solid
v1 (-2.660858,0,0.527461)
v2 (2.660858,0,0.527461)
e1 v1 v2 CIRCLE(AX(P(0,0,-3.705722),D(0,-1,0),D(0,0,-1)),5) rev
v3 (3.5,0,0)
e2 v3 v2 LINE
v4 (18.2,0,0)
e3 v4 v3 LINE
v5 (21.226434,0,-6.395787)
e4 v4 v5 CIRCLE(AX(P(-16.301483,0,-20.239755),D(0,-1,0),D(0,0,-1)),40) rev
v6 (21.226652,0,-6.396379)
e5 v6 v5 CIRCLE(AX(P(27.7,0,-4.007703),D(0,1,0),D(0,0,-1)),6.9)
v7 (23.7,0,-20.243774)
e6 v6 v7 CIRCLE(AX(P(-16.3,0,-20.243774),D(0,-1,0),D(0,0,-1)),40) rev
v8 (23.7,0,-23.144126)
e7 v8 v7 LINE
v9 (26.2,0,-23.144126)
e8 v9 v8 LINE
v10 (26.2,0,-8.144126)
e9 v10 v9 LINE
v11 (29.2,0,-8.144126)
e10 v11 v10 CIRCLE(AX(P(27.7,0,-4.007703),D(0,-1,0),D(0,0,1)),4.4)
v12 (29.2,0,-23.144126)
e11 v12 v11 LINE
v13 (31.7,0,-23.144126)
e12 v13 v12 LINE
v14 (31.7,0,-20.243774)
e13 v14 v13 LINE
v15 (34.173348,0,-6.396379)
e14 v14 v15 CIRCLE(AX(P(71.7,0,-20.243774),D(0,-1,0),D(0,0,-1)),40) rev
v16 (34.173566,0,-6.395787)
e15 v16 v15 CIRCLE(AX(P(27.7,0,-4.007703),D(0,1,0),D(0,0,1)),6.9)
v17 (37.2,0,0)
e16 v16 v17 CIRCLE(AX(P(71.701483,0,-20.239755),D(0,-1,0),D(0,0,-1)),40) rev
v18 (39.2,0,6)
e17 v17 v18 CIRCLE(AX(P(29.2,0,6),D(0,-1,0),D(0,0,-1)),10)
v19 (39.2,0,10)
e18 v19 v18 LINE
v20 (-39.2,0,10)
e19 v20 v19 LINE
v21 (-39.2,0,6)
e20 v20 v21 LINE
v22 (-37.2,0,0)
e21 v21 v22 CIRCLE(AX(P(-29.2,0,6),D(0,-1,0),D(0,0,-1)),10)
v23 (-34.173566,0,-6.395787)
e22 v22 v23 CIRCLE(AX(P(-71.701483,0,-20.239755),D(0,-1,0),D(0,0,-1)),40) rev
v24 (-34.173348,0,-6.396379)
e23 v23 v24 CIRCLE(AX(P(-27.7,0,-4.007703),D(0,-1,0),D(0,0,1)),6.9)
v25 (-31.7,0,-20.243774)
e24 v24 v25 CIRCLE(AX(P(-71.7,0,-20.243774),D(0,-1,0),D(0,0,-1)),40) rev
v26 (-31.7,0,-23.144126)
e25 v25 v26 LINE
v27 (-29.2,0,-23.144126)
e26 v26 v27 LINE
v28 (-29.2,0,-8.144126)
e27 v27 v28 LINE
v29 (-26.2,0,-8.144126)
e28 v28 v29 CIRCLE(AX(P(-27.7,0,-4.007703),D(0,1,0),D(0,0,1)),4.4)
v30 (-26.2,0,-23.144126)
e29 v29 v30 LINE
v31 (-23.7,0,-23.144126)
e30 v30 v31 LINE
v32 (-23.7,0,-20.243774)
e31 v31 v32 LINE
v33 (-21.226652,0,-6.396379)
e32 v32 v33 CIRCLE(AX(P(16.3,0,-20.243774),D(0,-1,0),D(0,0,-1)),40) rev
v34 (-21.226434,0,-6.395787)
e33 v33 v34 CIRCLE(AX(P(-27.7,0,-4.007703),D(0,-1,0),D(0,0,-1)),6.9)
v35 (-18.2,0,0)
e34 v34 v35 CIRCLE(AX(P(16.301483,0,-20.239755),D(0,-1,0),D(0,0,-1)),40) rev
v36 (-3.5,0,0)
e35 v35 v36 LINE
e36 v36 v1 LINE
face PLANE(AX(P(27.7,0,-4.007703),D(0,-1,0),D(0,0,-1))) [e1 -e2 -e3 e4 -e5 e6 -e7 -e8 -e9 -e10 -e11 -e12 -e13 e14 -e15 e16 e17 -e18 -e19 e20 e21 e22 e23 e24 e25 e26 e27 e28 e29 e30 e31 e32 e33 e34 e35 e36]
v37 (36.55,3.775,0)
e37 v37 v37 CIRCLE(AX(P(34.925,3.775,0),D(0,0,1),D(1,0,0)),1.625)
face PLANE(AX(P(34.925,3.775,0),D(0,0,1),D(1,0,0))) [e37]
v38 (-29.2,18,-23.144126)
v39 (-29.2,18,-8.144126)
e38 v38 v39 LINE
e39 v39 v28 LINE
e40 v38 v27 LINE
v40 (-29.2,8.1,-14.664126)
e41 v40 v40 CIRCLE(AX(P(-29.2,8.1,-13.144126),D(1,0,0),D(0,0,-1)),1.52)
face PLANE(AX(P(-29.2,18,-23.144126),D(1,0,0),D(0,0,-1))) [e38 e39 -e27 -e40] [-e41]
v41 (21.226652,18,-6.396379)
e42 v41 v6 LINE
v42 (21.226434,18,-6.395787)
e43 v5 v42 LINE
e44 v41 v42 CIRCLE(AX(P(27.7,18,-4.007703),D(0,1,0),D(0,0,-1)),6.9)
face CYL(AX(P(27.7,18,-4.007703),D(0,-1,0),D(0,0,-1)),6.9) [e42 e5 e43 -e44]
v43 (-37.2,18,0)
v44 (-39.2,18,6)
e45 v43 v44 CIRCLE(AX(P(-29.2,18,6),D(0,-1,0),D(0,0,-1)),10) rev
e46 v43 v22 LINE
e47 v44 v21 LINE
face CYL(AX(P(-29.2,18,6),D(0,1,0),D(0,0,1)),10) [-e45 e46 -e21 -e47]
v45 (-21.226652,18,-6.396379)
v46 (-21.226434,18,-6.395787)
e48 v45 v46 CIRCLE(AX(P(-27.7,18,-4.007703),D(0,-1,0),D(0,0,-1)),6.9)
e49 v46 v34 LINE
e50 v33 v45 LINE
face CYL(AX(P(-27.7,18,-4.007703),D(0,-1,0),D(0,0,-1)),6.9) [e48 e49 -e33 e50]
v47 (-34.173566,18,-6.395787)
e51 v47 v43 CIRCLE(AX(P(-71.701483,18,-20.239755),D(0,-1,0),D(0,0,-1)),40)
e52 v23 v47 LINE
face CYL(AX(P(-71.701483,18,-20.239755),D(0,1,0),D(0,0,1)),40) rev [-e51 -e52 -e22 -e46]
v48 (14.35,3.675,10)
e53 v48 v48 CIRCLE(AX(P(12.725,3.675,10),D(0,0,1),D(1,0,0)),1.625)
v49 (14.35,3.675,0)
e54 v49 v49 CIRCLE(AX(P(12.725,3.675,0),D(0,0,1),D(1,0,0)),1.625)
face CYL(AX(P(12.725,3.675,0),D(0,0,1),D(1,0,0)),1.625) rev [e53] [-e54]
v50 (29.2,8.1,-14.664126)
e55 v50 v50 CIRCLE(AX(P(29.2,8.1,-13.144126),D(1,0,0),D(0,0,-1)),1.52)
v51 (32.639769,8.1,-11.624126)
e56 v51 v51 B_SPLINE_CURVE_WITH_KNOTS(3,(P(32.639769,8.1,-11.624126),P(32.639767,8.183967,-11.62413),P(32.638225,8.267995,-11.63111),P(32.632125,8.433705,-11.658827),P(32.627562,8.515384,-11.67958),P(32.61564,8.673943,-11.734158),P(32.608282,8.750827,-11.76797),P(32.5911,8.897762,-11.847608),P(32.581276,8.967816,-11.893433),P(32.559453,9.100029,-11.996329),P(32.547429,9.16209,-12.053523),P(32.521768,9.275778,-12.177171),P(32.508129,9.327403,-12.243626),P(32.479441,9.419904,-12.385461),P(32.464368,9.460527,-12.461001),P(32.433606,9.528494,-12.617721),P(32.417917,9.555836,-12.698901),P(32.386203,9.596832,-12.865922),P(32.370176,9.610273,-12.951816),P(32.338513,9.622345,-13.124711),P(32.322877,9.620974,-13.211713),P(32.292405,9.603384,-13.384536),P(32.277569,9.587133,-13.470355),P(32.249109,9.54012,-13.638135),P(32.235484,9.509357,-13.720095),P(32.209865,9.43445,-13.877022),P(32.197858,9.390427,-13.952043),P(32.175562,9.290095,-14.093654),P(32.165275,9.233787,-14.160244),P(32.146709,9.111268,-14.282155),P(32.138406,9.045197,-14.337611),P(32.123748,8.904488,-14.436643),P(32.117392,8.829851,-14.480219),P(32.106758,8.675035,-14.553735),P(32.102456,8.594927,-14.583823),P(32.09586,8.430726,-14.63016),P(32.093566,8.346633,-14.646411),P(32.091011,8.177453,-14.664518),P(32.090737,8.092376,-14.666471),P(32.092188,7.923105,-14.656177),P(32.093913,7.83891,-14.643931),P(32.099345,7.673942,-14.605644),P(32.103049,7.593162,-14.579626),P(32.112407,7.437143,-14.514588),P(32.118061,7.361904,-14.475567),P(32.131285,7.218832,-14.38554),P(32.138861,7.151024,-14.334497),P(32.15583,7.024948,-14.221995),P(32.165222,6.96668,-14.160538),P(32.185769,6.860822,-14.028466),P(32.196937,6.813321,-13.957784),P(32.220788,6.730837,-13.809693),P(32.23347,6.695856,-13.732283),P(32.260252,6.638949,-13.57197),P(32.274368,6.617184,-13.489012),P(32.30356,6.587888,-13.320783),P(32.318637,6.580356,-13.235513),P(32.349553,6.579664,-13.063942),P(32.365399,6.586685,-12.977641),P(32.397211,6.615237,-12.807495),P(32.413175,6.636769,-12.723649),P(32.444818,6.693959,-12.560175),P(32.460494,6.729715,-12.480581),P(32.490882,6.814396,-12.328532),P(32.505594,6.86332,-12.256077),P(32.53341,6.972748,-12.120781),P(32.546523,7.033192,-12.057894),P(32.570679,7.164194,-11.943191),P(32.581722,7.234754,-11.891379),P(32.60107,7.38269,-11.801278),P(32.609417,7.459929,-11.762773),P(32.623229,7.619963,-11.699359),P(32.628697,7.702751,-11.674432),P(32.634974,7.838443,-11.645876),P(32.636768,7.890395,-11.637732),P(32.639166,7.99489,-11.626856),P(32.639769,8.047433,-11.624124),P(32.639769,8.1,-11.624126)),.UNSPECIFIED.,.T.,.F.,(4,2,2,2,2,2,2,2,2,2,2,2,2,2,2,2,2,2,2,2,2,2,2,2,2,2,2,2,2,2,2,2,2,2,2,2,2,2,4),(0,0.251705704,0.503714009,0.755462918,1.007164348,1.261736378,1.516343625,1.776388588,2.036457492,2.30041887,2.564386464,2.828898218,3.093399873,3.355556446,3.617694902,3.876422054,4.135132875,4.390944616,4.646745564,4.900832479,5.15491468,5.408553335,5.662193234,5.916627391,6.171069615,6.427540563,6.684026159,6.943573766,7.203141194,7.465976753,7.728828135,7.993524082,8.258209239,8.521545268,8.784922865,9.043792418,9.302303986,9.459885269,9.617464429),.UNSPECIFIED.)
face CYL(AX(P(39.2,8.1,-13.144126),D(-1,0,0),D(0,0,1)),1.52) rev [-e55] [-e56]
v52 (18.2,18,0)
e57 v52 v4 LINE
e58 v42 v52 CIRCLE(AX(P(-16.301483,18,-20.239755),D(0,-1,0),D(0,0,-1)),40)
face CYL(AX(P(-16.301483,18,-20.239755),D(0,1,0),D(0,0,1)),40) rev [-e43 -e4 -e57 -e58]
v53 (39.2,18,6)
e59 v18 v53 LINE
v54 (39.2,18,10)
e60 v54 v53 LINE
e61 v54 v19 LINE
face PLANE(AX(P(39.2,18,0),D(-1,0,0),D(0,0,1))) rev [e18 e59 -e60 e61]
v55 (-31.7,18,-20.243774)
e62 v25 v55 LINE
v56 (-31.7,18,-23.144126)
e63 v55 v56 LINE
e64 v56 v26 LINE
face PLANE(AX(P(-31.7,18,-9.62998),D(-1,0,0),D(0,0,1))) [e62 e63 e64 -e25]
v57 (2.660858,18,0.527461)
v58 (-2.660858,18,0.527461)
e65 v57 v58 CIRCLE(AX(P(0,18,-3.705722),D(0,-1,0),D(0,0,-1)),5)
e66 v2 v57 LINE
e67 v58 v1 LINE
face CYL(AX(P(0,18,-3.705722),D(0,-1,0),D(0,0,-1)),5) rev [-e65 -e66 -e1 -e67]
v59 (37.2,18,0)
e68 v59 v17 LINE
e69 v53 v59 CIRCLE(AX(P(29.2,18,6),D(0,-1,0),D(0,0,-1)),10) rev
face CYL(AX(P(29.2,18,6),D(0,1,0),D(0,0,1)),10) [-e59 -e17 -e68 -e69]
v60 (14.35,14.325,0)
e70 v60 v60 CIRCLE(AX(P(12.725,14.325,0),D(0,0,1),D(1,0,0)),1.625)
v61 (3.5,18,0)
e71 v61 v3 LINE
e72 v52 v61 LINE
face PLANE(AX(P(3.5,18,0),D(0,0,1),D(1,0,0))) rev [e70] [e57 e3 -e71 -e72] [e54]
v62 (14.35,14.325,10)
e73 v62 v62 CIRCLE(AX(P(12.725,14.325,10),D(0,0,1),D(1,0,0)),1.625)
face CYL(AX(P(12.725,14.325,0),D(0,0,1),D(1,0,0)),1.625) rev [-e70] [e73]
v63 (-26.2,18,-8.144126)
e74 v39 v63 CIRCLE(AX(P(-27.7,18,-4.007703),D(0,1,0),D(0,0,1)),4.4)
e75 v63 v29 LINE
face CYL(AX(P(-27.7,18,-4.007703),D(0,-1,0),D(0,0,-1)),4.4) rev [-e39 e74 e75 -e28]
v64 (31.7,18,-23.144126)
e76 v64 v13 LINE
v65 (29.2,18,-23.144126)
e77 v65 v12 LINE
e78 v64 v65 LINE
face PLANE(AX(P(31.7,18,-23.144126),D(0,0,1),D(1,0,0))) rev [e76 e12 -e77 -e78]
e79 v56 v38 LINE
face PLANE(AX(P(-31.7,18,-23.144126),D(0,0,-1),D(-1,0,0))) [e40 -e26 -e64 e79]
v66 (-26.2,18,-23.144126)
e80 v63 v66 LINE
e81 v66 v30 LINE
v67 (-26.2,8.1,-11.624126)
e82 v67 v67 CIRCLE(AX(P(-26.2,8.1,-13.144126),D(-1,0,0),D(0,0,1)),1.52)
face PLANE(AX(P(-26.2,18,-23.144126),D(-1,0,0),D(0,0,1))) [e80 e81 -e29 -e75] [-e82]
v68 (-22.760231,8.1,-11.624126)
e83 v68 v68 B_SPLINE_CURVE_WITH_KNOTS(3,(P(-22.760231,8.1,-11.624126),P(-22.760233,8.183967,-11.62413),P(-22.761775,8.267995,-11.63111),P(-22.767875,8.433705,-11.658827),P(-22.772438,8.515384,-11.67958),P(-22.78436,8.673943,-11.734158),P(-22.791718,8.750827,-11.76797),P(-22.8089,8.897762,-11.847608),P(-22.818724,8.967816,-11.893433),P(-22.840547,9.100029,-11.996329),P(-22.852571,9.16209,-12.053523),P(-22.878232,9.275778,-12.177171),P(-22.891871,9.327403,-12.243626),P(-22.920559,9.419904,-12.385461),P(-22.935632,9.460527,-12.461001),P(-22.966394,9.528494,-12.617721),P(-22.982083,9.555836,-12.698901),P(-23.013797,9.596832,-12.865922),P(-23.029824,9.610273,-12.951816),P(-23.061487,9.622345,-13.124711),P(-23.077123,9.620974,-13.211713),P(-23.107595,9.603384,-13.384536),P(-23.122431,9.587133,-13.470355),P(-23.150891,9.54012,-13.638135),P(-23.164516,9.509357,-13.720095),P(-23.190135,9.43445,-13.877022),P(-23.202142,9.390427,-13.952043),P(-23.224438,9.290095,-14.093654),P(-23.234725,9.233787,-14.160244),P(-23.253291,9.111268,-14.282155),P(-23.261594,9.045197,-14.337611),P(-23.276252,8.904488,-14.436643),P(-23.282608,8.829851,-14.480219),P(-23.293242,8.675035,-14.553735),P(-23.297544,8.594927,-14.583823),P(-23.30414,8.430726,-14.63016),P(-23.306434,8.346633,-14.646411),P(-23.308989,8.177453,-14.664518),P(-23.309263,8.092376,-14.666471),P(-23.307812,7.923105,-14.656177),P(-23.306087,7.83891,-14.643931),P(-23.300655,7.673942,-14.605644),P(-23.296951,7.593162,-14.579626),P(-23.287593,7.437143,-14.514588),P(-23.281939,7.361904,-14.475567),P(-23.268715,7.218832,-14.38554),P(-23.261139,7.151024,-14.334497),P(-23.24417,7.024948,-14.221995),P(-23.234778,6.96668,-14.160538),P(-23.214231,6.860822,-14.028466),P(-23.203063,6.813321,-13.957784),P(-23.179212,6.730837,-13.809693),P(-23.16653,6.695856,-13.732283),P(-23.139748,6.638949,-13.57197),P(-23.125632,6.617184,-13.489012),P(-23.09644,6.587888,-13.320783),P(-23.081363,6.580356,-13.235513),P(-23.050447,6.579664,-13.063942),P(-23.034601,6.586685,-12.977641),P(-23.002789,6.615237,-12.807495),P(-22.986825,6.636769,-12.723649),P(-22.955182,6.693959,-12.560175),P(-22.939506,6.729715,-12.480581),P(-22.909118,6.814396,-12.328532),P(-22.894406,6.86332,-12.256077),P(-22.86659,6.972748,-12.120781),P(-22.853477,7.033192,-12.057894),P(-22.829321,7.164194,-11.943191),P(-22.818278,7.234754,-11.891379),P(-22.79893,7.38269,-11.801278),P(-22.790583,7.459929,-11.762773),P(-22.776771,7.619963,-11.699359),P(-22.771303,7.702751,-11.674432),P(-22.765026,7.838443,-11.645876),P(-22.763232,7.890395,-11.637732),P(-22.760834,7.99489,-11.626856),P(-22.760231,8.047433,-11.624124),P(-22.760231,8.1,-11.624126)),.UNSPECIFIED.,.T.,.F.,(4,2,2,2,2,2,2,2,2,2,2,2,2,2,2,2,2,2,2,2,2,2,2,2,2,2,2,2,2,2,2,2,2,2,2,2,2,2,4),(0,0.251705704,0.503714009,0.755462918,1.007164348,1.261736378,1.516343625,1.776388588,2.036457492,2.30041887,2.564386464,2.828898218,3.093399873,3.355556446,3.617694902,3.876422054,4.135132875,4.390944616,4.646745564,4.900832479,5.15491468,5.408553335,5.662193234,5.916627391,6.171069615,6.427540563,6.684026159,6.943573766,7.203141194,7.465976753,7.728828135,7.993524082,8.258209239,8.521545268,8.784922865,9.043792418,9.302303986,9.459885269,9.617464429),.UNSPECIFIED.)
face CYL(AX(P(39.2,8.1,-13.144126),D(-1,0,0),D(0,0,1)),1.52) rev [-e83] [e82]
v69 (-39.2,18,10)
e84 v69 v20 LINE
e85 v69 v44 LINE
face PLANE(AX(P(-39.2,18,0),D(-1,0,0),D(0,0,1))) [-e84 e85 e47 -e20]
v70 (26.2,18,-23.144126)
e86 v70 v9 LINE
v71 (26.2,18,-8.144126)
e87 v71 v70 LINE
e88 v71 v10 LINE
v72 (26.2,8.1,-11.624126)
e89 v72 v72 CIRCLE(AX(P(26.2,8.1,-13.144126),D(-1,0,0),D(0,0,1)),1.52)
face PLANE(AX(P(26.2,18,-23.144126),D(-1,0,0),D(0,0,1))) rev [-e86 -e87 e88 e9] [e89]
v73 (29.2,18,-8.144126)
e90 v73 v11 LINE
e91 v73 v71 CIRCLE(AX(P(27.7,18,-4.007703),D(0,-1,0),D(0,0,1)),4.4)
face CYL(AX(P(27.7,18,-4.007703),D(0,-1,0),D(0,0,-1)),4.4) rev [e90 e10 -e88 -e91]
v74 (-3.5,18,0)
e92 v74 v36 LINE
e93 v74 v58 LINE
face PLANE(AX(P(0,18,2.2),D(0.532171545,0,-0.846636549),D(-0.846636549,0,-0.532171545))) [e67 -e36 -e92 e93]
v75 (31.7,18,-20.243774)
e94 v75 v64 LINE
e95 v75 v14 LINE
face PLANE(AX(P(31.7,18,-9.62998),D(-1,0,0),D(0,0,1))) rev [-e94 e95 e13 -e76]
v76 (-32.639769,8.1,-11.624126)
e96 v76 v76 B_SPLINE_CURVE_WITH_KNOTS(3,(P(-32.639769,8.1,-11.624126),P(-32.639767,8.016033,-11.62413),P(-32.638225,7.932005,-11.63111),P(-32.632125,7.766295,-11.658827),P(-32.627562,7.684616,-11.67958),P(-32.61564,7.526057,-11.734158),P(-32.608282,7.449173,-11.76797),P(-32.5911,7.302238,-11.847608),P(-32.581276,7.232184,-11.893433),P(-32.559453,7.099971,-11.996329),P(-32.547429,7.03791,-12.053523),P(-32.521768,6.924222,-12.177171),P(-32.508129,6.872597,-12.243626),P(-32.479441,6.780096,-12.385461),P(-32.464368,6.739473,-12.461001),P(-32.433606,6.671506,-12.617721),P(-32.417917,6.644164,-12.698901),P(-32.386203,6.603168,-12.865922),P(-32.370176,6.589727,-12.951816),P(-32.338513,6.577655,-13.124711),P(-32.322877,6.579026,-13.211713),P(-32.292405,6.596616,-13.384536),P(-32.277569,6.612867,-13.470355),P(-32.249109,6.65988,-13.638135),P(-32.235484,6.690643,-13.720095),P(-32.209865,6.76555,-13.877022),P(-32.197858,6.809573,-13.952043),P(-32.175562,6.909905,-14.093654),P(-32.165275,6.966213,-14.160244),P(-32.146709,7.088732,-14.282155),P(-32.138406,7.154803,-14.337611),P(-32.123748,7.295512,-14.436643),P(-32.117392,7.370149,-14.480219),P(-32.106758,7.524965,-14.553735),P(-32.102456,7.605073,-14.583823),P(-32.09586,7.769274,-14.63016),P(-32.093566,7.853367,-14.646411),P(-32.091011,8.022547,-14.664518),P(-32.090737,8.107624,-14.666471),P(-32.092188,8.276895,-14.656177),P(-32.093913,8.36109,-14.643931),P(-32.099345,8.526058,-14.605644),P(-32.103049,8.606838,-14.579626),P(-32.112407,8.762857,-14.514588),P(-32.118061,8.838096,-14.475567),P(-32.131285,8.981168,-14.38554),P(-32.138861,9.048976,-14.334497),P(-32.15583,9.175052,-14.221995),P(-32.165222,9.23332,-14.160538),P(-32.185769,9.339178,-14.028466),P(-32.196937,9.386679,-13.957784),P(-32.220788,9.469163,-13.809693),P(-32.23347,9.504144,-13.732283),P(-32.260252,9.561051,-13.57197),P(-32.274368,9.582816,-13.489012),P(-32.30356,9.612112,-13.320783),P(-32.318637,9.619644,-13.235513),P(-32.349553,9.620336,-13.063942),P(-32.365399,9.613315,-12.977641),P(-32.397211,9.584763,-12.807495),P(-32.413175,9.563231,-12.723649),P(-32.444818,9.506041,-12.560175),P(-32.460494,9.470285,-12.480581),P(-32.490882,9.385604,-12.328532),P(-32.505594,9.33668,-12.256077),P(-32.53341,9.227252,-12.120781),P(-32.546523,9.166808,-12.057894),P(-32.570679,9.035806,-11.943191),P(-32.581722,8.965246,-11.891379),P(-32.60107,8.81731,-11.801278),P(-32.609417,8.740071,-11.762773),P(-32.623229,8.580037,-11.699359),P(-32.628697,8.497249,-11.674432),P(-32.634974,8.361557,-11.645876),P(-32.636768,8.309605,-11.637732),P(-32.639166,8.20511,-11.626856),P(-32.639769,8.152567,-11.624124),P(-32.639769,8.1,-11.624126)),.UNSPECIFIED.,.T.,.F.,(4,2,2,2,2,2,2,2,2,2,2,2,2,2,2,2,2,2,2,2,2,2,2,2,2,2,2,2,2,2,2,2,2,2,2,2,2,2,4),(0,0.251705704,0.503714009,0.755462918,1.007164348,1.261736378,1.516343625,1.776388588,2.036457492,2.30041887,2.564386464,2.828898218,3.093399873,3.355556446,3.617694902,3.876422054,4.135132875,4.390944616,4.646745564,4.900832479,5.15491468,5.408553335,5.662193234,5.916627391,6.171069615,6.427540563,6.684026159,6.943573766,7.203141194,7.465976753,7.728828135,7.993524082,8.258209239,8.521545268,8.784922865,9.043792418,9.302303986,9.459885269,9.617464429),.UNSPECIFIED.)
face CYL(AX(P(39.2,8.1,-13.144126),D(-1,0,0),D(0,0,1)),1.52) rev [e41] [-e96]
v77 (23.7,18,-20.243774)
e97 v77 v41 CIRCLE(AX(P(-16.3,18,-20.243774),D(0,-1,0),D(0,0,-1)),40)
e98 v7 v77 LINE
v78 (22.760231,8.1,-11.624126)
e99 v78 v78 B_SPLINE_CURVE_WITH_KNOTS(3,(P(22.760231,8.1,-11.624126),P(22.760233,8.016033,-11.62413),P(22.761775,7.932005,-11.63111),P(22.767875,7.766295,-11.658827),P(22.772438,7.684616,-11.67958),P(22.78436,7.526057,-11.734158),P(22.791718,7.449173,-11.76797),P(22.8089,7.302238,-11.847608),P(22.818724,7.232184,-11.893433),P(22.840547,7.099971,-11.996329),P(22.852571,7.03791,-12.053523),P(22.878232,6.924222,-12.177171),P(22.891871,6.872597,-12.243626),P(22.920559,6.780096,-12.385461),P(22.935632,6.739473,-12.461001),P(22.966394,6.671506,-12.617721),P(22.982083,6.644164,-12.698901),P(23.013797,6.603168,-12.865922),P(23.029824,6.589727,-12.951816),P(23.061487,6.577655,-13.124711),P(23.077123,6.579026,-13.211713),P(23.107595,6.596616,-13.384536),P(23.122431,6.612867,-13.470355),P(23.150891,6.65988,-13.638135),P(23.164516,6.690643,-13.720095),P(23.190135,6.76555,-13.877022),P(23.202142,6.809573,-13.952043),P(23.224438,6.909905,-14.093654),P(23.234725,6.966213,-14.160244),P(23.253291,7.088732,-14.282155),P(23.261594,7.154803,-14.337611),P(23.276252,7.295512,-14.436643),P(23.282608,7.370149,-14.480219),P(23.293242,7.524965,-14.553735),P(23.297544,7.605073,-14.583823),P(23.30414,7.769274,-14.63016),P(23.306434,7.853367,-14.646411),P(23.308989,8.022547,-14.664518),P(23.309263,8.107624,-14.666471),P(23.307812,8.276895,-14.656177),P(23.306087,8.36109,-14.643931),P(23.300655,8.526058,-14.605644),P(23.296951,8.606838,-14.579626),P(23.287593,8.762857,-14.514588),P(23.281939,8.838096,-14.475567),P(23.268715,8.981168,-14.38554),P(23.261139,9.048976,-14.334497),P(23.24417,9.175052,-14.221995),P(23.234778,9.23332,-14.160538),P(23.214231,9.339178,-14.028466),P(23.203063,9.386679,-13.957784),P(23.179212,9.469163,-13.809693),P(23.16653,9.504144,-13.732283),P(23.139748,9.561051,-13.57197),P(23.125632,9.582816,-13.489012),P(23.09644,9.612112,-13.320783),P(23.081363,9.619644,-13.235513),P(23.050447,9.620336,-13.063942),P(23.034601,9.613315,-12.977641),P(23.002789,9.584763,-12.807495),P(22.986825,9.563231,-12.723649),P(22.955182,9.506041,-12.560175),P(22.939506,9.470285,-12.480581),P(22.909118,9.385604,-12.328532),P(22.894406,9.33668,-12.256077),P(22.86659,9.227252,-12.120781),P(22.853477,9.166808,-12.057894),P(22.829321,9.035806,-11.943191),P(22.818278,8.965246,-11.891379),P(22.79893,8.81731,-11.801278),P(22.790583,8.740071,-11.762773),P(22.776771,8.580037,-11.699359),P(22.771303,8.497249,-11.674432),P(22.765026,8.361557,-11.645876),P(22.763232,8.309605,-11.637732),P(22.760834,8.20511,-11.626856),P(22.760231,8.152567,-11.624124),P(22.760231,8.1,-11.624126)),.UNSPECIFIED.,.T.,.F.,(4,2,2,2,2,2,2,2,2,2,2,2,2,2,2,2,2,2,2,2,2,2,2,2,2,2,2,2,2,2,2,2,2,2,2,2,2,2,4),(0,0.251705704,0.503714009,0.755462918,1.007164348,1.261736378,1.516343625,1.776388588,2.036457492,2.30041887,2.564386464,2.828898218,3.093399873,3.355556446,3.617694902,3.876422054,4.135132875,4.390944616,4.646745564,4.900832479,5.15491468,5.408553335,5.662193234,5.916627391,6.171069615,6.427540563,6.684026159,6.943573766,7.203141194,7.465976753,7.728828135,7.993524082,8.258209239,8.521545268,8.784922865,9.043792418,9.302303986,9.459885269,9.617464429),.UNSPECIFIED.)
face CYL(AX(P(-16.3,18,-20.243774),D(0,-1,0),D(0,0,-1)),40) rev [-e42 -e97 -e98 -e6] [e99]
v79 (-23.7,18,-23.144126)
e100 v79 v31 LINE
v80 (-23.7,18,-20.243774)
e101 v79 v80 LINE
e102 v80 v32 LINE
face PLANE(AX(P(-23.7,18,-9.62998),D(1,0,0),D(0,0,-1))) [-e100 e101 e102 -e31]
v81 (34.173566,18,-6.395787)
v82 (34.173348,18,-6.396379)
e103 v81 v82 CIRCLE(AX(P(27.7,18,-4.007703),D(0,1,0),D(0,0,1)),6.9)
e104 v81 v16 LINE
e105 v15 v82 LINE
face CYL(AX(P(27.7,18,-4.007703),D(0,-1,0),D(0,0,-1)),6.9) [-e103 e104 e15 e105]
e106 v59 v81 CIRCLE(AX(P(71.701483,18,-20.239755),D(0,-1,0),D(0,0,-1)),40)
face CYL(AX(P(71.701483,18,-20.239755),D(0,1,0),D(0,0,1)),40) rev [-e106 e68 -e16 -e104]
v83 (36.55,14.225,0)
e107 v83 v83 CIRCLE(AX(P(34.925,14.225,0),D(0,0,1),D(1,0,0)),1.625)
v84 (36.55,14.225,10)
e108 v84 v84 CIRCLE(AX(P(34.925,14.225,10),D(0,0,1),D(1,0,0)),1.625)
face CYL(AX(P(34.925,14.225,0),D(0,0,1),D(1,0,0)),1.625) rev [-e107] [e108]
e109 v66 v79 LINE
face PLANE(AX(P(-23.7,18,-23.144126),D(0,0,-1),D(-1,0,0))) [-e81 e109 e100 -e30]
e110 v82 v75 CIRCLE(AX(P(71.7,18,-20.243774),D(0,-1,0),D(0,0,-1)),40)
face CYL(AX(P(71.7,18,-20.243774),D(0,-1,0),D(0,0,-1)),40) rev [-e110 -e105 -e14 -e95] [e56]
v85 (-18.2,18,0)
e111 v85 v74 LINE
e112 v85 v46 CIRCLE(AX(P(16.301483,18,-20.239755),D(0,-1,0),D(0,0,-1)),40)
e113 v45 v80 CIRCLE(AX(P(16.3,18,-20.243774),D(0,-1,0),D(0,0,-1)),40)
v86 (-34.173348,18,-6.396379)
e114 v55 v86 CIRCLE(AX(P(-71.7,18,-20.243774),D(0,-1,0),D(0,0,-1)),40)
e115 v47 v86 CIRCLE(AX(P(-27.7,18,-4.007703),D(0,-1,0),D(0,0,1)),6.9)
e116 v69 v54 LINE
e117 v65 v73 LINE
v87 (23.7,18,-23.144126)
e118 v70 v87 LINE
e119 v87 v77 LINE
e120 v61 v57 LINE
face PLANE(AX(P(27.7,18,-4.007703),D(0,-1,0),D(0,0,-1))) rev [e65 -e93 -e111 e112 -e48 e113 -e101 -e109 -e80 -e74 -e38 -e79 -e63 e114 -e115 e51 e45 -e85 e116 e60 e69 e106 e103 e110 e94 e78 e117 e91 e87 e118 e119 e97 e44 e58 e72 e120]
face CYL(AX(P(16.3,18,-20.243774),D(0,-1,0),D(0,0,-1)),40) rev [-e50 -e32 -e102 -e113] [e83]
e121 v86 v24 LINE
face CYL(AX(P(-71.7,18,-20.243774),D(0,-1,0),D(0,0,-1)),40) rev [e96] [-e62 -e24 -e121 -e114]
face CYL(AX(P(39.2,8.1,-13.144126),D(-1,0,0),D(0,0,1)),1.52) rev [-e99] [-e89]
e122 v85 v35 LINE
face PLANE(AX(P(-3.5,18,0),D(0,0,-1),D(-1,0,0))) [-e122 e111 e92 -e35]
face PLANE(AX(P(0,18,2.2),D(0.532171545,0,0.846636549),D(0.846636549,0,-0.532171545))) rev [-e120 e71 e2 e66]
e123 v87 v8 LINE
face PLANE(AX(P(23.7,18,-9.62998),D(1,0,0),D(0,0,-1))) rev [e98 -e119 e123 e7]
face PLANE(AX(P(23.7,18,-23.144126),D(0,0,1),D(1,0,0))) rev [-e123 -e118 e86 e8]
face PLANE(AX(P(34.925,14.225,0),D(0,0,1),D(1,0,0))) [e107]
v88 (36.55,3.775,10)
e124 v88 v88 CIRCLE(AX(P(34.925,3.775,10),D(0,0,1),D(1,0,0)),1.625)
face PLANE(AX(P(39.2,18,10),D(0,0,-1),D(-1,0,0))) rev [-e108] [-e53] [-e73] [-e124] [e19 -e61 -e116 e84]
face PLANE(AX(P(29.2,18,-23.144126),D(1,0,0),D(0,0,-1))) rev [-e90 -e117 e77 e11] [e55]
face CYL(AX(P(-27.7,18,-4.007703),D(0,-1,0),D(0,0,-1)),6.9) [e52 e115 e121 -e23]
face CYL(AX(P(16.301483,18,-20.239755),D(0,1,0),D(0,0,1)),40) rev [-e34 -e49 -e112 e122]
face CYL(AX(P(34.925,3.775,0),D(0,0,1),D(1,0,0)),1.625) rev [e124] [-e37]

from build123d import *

# Parameters (mm, degrees)
BOSS_EXTRUDE1_DEPTH     = 18
FILLET1_R               = 40
FILLET2_R               = 10
CUT_EXTRUDE1_DEPTH      = 75.41915473
CUT_EXTRUDE1_DEPTH_BACK = 75.41915473
SKETCH8_R               = 1.52
FILLET3_R               = 5
SKETCH13_R              = 1.625
CUT_EXTRUDE6_DEPTH      = 10
SKETCH14_R              = 1.625
CUT_EXTRUDE7_DEPTH      = 10


with BuildPart() as part:
    # Sketch7 → Boss-Extrude1 (new body)
    with BuildSketch(Plane(origin=(0, 0, 0), x_dir=(1, 0, 0), z_dir=(0, 1, 0))):
        with BuildLine():
            Line((3.5, 0), (18.2, 0))
            Line((18.2, 0), (20.800813361, 4.113644998))
            ThreePointArc((20.800813361, 4.113644998), (21.592172613, 7.217756586), (23.7, 9.629980027))
            Line((23.7, 9.629980027), (23.7, 23.144126484))
            Line((23.7, 23.144126484), (26.2, 23.144126484))
            Line((26.2, 23.144126484), (26.2, 8.144126484))
            ThreePointArc((26.2, 8.144126484), (27.7, -0.392297092), (29.2, 8.144126484))
            Line((29.2, 8.144126484), (29.2, 23.144126484))
            Line((29.2, 23.144126484), (31.7, 23.144126484))
            Line((31.7, 23.144126484), (31.7, 9.629980027))
            ThreePointArc((31.7, 9.629980027), (33.807827387, 7.217756586), (34.599186639, 4.113644998))
            Line((34.599186639, 4.113644998), (37.2, 0))
            Line((37.2, 0), (39.2, 0))
            Line((39.2, 0), (39.2, -10))
            Line((39.2, -10), (0, -10))
            Line((0, -10), (0, -2.2))
            Line((0, -2.2), (3.5, 0))
        make_face()
    boss_extrude1 = extrude(amount=BOSS_EXTRUDE1_DEPTH)

    # Mirror1: Boss-Extrude1 across plane
    add(boss_extrude1.mirror(Plane(origin=(0, 18, 10), x_dir=(0, 0, 1), z_dir=(1, 0, 0))))

    # Fillet1
    # the kernel refuses this fillet: 40 mm, written as the material it adds along each edge
    with BuildSketch(Plane(origin=(23.7, 0, -9.629980027), x_dir=(0, 0, -1), z_dir=(0, 1, 0)), Plane(origin=(-31.7, 0, -9.629980027), x_dir=(0, 0, -1), z_dir=(0, 1, 0))) as fillet1_piece_1:
        with BuildLine():
            CenterArc((10.613793835, 40), FILLET1_R, 249.745857862, 20.254142138)
            Line((-3.233601435, 2.473347548), (-3.51054934, 1.722814499))
            ThreePointArc((-3.51054934, 1.722814499), (-1.916270335, 0.845153632), (-0.651858217, -0.463768116))
            Line((-0.651858217, -0.463768116), (0, -0.8))
            Line((0, -0.8), (10.613793835, -0.8))
            Line((10.613793835, -0.8), (10.613793835, 0))
        make_face()
    extrude(amount=18)
    with BuildSketch(Plane(origin=(20.800813361, 0, -4.113644998), x_dir=(0.18333937231858005, 0, -0.9830496806152929), z_dir=(0, 1, 0)), Plane(origin=(-34.599186639, 0, -4.113644998), x_dir=(0.18333937231857603, 0, -0.9830496806152935), z_dir=(0, 1, 0))) as fillet1_piece_2:
        with BuildLine():
            CenterArc((9.050455959, 39.429951175), FILLET1_R, 250.166978756, 10.14844141)
            Line((-4.52074889, 1.802535653), (-4.792172987, 1.049987342))
            ThreePointArc((-4.792172987, 1.049987342), (-2.556670036, 0.158160214), (-0.296295591, -0.743107612))
            Line((-0.296295591, -0.743107612), (0.134579271, -0.788599024))
            ThreePointArc((0.134579271, -0.788599024), (1.16074621, -0.701666578), (2.18691315, -0.788599024))
            Line((2.18691315, -0.788599024), (2.321492421, 0))
        make_face()
    extrude(amount=18)
    with BuildSketch(Plane(origin=(31.7, 0, -9.629980027), x_dir=(0, 0, -1), z_dir=(0, 1, 0))) as fillet1_piece_3:
        with BuildLine():
            CenterArc((10.613793835, -40), FILLET1_R, 90, 20.254142138)
            Line((-3.233601435, -2.473347548), (-3.51054934, -1.722814499))
            ThreePointArc((-3.51054934, -1.722814499), (-1.916270335, -0.845153632), (-0.651858217, 0.463768116))
            Line((-0.651858217, 0.463768116), (0, 0.8))
            Line((0, 0.8), (10.613793835, 0.8))
            Line((10.613793835, 0.8), (10.613793835, 0))
        make_face()
    extrude(amount=18)
    with BuildSketch(Plane(origin=(34.599186639, 0, -4.113644998), x_dir=(0.5343927114747591, 0, 0.8452363160221257), z_dir=(0, 1, 0)), Plane(origin=(-20.800813361, 0, -4.113644998), x_dir=(0.5343927114747586, 0, 0.8452363160221262), z_dir=(0, 1, 0))) as fillet1_piece_4:
        with BuildLine():
            CenterArc((6.196822464, 39.977883812), FILLET1_R, 257.946173426, 10.14844141)
            Line((-2.156398361, 0.859809961), (-2.323462777, 0.077448484))
            ThreePointArc((-2.323462777, 0.077448484), (-1.338075072, -0.221862238), (-0.417081618, -0.682673366))
            Line((-0.417081618, -0.682673366), (0, -0.8))
            ThreePointArc((0, -0.8), (2.433428924, -0.8), (4.840258555, -0.799557676))
            Line((4.840258555, -0.799557676), (4.866857847, 0))
        make_face()
    extrude(amount=18)
    with BuildSketch(Plane(origin=(-23.7, 0, -9.629980027), x_dir=(0.6075420957696648, 0, 0.7942874806188269), z_dir=(0, 1, 0))) as fillet1_piece_5:
        with BuildLine():
            CenterArc((15.871280266, 38.219825775), FILLET1_R, 232.588008111, 20.254142138)
            Line((-8.430403565, 6.44832655), (-8.916437241, 5.812896566))
            Line((-8.916437241, 5.812896566), (-0.486033677, -0.635429984))
            Line((-0.486033677, -0.635429984), (0.236004168, -0.764396516))
            ThreePointArc((0.236004168, -0.764396516), (2.035535945, -0.492919946), (3.835067722, -0.764396516))
            Line((3.835067722, -0.764396516), (4.07107189, 0))
        make_face()
    extrude(amount=18)

    # Fillet2
    # the kernel refuses this fillet: 10 mm, written as the material it takes off along each edge
    with BuildSketch(Plane(origin=(-39.2, -15, 0), x_dir=(1, 0, 0), z_dir=(0, 1, 0))) as fillet2_piece_1:
        with BuildLine():
            CenterArc((10, -6), FILLET2_R, 143.130102354, 36.869897646)
            Line((0, -6), (-0.2, -6))
            Line((-0.2, -6), (-0.2, 0))
            Line((-0.2, 0), (0, 0.2))
            ThreePointArc((0, 0.2), (1, 0.2), (1.84, 0.12))
            Line((1.84, 0.12), (2, 0))
        make_face()
    extrude(amount=48, mode=Mode.SUBTRACT)
    with BuildSketch(Plane(origin=(39.2, -15, 0), x_dir=(0, 0, 1), z_dir=(0, 1, 0))) as fillet2_piece_2:
        with BuildLine():
            CenterArc((6, -10), FILLET2_R, 90, 36.869897646)
            Line((0, -2), (-0.12, -1.84))
            ThreePointArc((-0.12, -1.84), (-0.2, -1), (-0.2, 0))
            Line((-0.2, 0), (0, 0.2))
            Line((0, 0.2), (6, 0.2))
            Line((6, 0.2), (6, 0))
        make_face()
    extrude(amount=48, mode=Mode.SUBTRACT)

    # Sketch8 → Cut-Extrude1 (cut, two sides: drawn at the far end of the back side and taken through both)
    with BuildSketch(Plane.ZY.offset(-29.2).offset(-CUT_EXTRUDE1_DEPTH_BACK)):
        with Locations((-13.144126484, 8.1)):
            Circle(SKETCH8_R)
    extrude(amount=CUT_EXTRUDE1_DEPTH + CUT_EXTRUDE1_DEPTH_BACK, mode=Mode.SUBTRACT)

    # Fillet3
    fillet3_edges = [part.edges().sort_by_distance(p)[0] for p in [
        (0, 9, 2.2),
    ]]
    fillet(fillet3_edges, radius=FILLET3_R)

    # Sketch13 → Cut-Extrude6 (cut)
    with BuildSketch(Plane.XY.offset(10)):
        with Locations((12.725, 3.675)):
            Circle(SKETCH13_R)
        with Locations((34.925, 14.225)):
            Circle(SKETCH13_R)
    extrude(amount=-CUT_EXTRUDE6_DEPTH, mode=Mode.SUBTRACT)

    # Sketch14 → Cut-Extrude7 (cut)
    with BuildSketch(Plane.XY.offset(10)):
        with Locations((12.725, 14.325)):
            Circle(SKETCH14_R)
        with Locations((34.925, 3.775)):
            Circle(SKETCH14_R)
    extrude(amount=-CUT_EXTRUDE7_DEPTH, mode=Mode.SUBTRACT)


solid = part.part
